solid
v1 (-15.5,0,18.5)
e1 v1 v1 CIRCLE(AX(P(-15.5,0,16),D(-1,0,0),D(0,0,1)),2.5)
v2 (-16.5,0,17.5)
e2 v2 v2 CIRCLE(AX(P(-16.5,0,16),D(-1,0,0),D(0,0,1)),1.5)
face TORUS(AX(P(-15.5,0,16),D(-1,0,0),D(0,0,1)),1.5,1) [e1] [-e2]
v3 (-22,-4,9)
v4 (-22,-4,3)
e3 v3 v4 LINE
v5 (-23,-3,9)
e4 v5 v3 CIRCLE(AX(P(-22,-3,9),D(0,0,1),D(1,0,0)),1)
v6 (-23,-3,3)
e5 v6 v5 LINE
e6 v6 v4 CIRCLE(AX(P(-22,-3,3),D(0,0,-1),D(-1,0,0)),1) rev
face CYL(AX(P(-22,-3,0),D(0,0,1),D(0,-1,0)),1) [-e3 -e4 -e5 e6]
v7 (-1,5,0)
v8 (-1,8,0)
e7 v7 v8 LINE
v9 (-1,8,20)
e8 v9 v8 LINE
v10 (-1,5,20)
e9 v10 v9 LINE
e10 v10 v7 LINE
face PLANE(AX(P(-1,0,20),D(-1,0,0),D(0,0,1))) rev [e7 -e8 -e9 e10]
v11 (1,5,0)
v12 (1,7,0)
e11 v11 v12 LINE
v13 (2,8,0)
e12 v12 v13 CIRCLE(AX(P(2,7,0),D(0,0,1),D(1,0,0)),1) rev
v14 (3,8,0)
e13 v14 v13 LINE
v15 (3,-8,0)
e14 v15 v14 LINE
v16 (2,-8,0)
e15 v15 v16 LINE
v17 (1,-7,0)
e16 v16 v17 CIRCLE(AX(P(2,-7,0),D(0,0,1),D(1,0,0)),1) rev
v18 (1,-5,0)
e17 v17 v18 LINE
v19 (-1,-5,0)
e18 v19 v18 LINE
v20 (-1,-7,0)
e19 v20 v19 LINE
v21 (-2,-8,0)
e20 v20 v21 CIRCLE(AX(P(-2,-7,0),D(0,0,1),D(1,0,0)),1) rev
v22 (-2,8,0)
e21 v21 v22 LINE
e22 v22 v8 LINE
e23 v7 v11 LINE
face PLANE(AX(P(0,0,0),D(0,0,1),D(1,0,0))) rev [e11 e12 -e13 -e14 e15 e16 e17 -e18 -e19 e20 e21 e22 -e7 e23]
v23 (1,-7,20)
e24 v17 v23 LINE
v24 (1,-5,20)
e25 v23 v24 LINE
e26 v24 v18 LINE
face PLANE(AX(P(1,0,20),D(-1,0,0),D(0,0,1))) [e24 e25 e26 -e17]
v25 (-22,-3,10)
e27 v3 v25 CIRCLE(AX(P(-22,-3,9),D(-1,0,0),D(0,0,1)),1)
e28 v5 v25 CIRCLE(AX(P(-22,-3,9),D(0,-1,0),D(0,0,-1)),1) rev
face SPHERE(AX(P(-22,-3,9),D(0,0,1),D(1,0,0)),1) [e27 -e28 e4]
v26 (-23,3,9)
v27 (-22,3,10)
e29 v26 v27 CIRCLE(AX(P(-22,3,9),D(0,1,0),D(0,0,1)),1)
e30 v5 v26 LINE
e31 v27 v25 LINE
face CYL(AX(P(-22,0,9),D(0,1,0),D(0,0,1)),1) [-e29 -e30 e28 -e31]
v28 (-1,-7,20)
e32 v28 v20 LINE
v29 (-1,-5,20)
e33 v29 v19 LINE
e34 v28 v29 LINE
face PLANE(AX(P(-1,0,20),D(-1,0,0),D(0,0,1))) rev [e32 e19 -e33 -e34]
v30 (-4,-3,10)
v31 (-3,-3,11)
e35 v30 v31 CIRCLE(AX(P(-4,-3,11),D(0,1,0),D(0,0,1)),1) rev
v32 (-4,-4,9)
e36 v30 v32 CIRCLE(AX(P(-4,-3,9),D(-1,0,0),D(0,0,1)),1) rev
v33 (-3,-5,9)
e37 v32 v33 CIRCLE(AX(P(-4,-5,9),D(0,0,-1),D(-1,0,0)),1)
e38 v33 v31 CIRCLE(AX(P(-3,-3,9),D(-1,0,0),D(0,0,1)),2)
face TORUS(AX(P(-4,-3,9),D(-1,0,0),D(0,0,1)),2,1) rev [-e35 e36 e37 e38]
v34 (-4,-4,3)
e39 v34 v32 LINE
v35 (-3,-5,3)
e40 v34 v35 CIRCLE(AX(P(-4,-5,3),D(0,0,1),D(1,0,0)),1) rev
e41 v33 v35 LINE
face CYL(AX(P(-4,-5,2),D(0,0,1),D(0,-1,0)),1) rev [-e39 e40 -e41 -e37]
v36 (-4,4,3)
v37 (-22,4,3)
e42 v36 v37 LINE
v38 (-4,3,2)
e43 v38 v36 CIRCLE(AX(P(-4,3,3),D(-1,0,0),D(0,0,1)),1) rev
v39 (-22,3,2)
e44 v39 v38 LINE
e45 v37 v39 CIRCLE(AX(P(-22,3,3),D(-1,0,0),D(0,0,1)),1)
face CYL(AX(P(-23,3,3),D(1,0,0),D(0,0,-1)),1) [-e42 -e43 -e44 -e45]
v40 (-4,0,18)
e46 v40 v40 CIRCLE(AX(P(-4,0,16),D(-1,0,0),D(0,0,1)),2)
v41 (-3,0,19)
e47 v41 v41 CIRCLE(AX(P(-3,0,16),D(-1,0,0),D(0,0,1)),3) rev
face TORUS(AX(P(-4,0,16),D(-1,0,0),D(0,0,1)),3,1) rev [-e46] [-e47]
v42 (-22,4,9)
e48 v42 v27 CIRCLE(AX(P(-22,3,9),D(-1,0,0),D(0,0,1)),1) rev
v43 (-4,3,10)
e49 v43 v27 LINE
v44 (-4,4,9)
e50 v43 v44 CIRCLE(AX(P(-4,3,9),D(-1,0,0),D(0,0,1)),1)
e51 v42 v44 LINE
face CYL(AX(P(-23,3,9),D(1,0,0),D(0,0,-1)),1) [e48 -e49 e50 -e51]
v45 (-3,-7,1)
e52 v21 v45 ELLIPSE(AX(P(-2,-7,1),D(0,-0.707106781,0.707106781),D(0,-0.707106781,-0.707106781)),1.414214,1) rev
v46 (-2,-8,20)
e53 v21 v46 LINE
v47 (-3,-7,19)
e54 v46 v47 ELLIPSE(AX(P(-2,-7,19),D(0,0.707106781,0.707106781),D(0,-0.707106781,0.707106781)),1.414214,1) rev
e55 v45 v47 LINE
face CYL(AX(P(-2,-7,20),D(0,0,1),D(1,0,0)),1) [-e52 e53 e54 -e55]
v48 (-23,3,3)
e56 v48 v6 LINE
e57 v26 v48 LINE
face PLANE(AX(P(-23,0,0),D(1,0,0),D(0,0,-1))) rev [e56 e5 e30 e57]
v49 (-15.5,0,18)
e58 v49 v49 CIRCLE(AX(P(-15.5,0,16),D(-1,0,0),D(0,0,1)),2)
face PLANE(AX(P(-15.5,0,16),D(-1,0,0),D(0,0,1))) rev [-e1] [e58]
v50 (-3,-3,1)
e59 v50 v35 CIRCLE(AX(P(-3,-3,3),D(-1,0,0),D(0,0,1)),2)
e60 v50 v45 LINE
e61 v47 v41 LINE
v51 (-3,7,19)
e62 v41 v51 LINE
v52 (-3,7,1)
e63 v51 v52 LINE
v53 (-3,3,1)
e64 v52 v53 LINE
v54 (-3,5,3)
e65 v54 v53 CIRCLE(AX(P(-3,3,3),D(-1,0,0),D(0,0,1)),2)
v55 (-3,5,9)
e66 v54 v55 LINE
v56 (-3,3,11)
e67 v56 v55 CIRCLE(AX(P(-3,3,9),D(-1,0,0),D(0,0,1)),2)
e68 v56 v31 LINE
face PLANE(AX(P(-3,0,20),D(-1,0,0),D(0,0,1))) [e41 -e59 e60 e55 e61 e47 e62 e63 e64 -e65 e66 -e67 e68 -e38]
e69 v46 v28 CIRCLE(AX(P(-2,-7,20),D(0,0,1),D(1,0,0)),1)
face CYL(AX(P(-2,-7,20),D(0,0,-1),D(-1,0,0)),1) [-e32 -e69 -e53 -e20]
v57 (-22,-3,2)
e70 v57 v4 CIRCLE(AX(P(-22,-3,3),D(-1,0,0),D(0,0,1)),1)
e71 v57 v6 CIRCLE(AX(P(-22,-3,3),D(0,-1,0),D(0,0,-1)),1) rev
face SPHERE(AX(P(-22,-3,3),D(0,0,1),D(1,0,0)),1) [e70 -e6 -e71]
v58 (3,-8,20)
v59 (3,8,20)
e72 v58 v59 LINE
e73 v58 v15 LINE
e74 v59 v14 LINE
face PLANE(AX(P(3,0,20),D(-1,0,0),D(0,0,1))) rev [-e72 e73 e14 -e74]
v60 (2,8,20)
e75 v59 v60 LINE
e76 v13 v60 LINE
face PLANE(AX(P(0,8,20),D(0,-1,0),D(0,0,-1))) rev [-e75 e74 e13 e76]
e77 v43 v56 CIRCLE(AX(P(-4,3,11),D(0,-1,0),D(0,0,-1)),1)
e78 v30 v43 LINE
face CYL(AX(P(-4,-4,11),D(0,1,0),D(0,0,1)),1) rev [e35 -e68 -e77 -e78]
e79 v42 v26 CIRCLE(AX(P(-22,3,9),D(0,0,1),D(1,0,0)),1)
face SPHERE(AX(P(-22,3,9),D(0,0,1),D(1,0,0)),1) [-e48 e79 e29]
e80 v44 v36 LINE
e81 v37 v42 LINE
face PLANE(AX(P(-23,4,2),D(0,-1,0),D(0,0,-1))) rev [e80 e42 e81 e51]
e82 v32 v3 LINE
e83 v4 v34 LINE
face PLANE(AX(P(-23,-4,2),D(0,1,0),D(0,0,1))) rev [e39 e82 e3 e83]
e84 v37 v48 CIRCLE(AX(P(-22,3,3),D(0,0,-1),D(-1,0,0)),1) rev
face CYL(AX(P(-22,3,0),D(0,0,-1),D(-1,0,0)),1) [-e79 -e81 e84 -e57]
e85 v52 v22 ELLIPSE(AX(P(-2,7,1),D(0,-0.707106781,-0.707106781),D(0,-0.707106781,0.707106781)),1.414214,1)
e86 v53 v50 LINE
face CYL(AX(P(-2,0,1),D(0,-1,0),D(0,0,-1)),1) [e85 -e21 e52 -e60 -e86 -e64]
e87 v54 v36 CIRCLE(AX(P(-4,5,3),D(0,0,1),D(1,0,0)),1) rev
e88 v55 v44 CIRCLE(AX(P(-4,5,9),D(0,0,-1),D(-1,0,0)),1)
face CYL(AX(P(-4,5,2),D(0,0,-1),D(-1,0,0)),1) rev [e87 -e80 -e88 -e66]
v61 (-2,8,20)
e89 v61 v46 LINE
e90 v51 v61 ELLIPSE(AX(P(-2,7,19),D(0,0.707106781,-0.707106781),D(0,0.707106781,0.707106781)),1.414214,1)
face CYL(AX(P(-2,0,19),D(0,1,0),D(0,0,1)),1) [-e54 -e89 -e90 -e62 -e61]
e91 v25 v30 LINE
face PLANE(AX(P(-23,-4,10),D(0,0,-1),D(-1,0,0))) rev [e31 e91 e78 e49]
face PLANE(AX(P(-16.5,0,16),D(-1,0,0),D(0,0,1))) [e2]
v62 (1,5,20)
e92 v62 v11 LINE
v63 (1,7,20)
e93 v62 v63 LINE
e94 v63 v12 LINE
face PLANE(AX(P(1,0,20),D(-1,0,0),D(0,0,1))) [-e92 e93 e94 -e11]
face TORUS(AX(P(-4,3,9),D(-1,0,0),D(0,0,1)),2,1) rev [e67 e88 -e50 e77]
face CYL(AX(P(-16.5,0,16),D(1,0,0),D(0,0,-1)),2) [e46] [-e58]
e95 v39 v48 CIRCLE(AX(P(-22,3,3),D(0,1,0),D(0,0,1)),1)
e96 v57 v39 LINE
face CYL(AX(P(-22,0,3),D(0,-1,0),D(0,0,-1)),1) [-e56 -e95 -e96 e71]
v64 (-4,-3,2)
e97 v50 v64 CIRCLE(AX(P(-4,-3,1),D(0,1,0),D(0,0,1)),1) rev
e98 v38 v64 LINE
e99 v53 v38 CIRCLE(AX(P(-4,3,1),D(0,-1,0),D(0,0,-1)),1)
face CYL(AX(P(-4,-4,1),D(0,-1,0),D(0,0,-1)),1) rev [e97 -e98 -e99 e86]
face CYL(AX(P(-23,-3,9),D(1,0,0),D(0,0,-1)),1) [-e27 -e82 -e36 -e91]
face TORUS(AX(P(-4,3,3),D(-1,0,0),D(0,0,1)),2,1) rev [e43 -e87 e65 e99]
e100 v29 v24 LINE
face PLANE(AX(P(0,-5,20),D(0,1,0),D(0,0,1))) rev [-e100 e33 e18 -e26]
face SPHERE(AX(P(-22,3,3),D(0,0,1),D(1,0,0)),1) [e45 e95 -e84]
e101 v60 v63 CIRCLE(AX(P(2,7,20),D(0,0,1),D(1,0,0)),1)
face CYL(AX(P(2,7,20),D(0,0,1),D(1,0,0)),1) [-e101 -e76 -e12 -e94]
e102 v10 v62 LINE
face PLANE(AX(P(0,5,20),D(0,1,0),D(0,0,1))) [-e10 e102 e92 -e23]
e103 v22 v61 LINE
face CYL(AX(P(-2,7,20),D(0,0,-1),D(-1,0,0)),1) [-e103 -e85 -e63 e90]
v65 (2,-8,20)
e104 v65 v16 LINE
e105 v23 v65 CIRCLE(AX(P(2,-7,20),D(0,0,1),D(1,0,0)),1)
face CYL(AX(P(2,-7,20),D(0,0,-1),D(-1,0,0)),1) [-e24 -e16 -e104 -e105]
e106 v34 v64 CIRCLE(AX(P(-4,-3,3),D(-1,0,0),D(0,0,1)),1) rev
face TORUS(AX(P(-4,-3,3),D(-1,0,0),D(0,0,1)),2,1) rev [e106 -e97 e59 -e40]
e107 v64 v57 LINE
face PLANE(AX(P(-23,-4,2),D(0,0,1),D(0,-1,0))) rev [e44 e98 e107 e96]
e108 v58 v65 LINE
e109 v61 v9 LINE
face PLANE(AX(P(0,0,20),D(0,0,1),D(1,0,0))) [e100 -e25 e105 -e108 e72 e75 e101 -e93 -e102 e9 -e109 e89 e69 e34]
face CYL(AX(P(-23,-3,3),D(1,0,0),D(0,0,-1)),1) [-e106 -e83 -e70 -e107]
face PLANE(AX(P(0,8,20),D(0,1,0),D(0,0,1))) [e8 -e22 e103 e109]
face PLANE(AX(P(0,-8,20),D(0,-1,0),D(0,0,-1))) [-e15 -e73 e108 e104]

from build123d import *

# Parameters (mm, degrees)
SKETCH1_W           = 2
SKETCH1_H           = 10
BOSS_EXTRUDE1_DEPTH = 20
SKETCH2_R           = 2
BOSS_EXTRUDE2_DEPTH = 13.5
SKETCH3_R           = 2.5
BOSS_EXTRUDE3_DEPTH = 1
SKETCH4_W           = 8
SKETCH4_H           = 8
BOSS_EXTRUDE4_DEPTH = 20
FILLET1_R           = 1


with BuildPart() as part:
    # Sketch1 → Boss-Extrude1 (new body)
    with BuildSketch(Plane.XY):
        Polygon((-1, -8), (-1, -5), (-1, 5), (-1, 8), (-3, 8), (-3, -8), align=None)
        Rectangle(SKETCH1_W, SKETCH1_H)
        Polygon((1, 5), (1, -5), (1, -8), (3, -8), (3, 8), (1, 8), align=None)
    extrude(amount=BOSS_EXTRUDE1_DEPTH)

    # Sketch2 → Boss-Extrude2 (add)
    with BuildSketch(Plane.ZY.offset(3)):
        with Locations((16, 0)):
            Circle(SKETCH2_R)
    extrude(amount=BOSS_EXTRUDE2_DEPTH)

    # Sketch3 → Boss-Extrude3 (add)
    with BuildSketch(Plane.ZY.offset(16.5)):
        with Locations((16, 0)):
            Circle(SKETCH3_R)
    extrude(amount=-BOSS_EXTRUDE3_DEPTH)

    # Sketch4 → Boss-Extrude4 (add)
    with BuildSketch(Plane.ZY.offset(3)):
        with Locations((6, 0)):
            Rectangle(SKETCH4_W, SKETCH4_H)
    extrude(amount=BOSS_EXTRUDE4_DEPTH)

    # Fillet1
    fillet1_edges = [part.edges().sort_by_distance(p)[0] for p in [
        (-3, 0, 0),
        (-3, -8, 10),
        (-3, 8, 10),
        (1, 8, 10),
        (1, -8, 10),
        (-1, -8, 10),
        (-3, 0, 14),
        (-16.5, 0, 13.5),
        (-3, 0, 20),
        (-3, 0, 10),
        (-13, -4, 10),
        (-3, 4, 6),
        (-13, 4, 10),
        (-3, 0, 2),
        (-13, 4, 2),
        (-3, -4, 6),
        (-13, -4, 2),
        (-23, 0, 10),
        (-23, 4, 6),
        (-23, 0, 2),
        (-23, -4, 6),
    ]]
    fillet(fillet1_edges, radius=FILLET1_R - 0.0001)  # a hair under: the kernel refuses the full size


solid = part.part
